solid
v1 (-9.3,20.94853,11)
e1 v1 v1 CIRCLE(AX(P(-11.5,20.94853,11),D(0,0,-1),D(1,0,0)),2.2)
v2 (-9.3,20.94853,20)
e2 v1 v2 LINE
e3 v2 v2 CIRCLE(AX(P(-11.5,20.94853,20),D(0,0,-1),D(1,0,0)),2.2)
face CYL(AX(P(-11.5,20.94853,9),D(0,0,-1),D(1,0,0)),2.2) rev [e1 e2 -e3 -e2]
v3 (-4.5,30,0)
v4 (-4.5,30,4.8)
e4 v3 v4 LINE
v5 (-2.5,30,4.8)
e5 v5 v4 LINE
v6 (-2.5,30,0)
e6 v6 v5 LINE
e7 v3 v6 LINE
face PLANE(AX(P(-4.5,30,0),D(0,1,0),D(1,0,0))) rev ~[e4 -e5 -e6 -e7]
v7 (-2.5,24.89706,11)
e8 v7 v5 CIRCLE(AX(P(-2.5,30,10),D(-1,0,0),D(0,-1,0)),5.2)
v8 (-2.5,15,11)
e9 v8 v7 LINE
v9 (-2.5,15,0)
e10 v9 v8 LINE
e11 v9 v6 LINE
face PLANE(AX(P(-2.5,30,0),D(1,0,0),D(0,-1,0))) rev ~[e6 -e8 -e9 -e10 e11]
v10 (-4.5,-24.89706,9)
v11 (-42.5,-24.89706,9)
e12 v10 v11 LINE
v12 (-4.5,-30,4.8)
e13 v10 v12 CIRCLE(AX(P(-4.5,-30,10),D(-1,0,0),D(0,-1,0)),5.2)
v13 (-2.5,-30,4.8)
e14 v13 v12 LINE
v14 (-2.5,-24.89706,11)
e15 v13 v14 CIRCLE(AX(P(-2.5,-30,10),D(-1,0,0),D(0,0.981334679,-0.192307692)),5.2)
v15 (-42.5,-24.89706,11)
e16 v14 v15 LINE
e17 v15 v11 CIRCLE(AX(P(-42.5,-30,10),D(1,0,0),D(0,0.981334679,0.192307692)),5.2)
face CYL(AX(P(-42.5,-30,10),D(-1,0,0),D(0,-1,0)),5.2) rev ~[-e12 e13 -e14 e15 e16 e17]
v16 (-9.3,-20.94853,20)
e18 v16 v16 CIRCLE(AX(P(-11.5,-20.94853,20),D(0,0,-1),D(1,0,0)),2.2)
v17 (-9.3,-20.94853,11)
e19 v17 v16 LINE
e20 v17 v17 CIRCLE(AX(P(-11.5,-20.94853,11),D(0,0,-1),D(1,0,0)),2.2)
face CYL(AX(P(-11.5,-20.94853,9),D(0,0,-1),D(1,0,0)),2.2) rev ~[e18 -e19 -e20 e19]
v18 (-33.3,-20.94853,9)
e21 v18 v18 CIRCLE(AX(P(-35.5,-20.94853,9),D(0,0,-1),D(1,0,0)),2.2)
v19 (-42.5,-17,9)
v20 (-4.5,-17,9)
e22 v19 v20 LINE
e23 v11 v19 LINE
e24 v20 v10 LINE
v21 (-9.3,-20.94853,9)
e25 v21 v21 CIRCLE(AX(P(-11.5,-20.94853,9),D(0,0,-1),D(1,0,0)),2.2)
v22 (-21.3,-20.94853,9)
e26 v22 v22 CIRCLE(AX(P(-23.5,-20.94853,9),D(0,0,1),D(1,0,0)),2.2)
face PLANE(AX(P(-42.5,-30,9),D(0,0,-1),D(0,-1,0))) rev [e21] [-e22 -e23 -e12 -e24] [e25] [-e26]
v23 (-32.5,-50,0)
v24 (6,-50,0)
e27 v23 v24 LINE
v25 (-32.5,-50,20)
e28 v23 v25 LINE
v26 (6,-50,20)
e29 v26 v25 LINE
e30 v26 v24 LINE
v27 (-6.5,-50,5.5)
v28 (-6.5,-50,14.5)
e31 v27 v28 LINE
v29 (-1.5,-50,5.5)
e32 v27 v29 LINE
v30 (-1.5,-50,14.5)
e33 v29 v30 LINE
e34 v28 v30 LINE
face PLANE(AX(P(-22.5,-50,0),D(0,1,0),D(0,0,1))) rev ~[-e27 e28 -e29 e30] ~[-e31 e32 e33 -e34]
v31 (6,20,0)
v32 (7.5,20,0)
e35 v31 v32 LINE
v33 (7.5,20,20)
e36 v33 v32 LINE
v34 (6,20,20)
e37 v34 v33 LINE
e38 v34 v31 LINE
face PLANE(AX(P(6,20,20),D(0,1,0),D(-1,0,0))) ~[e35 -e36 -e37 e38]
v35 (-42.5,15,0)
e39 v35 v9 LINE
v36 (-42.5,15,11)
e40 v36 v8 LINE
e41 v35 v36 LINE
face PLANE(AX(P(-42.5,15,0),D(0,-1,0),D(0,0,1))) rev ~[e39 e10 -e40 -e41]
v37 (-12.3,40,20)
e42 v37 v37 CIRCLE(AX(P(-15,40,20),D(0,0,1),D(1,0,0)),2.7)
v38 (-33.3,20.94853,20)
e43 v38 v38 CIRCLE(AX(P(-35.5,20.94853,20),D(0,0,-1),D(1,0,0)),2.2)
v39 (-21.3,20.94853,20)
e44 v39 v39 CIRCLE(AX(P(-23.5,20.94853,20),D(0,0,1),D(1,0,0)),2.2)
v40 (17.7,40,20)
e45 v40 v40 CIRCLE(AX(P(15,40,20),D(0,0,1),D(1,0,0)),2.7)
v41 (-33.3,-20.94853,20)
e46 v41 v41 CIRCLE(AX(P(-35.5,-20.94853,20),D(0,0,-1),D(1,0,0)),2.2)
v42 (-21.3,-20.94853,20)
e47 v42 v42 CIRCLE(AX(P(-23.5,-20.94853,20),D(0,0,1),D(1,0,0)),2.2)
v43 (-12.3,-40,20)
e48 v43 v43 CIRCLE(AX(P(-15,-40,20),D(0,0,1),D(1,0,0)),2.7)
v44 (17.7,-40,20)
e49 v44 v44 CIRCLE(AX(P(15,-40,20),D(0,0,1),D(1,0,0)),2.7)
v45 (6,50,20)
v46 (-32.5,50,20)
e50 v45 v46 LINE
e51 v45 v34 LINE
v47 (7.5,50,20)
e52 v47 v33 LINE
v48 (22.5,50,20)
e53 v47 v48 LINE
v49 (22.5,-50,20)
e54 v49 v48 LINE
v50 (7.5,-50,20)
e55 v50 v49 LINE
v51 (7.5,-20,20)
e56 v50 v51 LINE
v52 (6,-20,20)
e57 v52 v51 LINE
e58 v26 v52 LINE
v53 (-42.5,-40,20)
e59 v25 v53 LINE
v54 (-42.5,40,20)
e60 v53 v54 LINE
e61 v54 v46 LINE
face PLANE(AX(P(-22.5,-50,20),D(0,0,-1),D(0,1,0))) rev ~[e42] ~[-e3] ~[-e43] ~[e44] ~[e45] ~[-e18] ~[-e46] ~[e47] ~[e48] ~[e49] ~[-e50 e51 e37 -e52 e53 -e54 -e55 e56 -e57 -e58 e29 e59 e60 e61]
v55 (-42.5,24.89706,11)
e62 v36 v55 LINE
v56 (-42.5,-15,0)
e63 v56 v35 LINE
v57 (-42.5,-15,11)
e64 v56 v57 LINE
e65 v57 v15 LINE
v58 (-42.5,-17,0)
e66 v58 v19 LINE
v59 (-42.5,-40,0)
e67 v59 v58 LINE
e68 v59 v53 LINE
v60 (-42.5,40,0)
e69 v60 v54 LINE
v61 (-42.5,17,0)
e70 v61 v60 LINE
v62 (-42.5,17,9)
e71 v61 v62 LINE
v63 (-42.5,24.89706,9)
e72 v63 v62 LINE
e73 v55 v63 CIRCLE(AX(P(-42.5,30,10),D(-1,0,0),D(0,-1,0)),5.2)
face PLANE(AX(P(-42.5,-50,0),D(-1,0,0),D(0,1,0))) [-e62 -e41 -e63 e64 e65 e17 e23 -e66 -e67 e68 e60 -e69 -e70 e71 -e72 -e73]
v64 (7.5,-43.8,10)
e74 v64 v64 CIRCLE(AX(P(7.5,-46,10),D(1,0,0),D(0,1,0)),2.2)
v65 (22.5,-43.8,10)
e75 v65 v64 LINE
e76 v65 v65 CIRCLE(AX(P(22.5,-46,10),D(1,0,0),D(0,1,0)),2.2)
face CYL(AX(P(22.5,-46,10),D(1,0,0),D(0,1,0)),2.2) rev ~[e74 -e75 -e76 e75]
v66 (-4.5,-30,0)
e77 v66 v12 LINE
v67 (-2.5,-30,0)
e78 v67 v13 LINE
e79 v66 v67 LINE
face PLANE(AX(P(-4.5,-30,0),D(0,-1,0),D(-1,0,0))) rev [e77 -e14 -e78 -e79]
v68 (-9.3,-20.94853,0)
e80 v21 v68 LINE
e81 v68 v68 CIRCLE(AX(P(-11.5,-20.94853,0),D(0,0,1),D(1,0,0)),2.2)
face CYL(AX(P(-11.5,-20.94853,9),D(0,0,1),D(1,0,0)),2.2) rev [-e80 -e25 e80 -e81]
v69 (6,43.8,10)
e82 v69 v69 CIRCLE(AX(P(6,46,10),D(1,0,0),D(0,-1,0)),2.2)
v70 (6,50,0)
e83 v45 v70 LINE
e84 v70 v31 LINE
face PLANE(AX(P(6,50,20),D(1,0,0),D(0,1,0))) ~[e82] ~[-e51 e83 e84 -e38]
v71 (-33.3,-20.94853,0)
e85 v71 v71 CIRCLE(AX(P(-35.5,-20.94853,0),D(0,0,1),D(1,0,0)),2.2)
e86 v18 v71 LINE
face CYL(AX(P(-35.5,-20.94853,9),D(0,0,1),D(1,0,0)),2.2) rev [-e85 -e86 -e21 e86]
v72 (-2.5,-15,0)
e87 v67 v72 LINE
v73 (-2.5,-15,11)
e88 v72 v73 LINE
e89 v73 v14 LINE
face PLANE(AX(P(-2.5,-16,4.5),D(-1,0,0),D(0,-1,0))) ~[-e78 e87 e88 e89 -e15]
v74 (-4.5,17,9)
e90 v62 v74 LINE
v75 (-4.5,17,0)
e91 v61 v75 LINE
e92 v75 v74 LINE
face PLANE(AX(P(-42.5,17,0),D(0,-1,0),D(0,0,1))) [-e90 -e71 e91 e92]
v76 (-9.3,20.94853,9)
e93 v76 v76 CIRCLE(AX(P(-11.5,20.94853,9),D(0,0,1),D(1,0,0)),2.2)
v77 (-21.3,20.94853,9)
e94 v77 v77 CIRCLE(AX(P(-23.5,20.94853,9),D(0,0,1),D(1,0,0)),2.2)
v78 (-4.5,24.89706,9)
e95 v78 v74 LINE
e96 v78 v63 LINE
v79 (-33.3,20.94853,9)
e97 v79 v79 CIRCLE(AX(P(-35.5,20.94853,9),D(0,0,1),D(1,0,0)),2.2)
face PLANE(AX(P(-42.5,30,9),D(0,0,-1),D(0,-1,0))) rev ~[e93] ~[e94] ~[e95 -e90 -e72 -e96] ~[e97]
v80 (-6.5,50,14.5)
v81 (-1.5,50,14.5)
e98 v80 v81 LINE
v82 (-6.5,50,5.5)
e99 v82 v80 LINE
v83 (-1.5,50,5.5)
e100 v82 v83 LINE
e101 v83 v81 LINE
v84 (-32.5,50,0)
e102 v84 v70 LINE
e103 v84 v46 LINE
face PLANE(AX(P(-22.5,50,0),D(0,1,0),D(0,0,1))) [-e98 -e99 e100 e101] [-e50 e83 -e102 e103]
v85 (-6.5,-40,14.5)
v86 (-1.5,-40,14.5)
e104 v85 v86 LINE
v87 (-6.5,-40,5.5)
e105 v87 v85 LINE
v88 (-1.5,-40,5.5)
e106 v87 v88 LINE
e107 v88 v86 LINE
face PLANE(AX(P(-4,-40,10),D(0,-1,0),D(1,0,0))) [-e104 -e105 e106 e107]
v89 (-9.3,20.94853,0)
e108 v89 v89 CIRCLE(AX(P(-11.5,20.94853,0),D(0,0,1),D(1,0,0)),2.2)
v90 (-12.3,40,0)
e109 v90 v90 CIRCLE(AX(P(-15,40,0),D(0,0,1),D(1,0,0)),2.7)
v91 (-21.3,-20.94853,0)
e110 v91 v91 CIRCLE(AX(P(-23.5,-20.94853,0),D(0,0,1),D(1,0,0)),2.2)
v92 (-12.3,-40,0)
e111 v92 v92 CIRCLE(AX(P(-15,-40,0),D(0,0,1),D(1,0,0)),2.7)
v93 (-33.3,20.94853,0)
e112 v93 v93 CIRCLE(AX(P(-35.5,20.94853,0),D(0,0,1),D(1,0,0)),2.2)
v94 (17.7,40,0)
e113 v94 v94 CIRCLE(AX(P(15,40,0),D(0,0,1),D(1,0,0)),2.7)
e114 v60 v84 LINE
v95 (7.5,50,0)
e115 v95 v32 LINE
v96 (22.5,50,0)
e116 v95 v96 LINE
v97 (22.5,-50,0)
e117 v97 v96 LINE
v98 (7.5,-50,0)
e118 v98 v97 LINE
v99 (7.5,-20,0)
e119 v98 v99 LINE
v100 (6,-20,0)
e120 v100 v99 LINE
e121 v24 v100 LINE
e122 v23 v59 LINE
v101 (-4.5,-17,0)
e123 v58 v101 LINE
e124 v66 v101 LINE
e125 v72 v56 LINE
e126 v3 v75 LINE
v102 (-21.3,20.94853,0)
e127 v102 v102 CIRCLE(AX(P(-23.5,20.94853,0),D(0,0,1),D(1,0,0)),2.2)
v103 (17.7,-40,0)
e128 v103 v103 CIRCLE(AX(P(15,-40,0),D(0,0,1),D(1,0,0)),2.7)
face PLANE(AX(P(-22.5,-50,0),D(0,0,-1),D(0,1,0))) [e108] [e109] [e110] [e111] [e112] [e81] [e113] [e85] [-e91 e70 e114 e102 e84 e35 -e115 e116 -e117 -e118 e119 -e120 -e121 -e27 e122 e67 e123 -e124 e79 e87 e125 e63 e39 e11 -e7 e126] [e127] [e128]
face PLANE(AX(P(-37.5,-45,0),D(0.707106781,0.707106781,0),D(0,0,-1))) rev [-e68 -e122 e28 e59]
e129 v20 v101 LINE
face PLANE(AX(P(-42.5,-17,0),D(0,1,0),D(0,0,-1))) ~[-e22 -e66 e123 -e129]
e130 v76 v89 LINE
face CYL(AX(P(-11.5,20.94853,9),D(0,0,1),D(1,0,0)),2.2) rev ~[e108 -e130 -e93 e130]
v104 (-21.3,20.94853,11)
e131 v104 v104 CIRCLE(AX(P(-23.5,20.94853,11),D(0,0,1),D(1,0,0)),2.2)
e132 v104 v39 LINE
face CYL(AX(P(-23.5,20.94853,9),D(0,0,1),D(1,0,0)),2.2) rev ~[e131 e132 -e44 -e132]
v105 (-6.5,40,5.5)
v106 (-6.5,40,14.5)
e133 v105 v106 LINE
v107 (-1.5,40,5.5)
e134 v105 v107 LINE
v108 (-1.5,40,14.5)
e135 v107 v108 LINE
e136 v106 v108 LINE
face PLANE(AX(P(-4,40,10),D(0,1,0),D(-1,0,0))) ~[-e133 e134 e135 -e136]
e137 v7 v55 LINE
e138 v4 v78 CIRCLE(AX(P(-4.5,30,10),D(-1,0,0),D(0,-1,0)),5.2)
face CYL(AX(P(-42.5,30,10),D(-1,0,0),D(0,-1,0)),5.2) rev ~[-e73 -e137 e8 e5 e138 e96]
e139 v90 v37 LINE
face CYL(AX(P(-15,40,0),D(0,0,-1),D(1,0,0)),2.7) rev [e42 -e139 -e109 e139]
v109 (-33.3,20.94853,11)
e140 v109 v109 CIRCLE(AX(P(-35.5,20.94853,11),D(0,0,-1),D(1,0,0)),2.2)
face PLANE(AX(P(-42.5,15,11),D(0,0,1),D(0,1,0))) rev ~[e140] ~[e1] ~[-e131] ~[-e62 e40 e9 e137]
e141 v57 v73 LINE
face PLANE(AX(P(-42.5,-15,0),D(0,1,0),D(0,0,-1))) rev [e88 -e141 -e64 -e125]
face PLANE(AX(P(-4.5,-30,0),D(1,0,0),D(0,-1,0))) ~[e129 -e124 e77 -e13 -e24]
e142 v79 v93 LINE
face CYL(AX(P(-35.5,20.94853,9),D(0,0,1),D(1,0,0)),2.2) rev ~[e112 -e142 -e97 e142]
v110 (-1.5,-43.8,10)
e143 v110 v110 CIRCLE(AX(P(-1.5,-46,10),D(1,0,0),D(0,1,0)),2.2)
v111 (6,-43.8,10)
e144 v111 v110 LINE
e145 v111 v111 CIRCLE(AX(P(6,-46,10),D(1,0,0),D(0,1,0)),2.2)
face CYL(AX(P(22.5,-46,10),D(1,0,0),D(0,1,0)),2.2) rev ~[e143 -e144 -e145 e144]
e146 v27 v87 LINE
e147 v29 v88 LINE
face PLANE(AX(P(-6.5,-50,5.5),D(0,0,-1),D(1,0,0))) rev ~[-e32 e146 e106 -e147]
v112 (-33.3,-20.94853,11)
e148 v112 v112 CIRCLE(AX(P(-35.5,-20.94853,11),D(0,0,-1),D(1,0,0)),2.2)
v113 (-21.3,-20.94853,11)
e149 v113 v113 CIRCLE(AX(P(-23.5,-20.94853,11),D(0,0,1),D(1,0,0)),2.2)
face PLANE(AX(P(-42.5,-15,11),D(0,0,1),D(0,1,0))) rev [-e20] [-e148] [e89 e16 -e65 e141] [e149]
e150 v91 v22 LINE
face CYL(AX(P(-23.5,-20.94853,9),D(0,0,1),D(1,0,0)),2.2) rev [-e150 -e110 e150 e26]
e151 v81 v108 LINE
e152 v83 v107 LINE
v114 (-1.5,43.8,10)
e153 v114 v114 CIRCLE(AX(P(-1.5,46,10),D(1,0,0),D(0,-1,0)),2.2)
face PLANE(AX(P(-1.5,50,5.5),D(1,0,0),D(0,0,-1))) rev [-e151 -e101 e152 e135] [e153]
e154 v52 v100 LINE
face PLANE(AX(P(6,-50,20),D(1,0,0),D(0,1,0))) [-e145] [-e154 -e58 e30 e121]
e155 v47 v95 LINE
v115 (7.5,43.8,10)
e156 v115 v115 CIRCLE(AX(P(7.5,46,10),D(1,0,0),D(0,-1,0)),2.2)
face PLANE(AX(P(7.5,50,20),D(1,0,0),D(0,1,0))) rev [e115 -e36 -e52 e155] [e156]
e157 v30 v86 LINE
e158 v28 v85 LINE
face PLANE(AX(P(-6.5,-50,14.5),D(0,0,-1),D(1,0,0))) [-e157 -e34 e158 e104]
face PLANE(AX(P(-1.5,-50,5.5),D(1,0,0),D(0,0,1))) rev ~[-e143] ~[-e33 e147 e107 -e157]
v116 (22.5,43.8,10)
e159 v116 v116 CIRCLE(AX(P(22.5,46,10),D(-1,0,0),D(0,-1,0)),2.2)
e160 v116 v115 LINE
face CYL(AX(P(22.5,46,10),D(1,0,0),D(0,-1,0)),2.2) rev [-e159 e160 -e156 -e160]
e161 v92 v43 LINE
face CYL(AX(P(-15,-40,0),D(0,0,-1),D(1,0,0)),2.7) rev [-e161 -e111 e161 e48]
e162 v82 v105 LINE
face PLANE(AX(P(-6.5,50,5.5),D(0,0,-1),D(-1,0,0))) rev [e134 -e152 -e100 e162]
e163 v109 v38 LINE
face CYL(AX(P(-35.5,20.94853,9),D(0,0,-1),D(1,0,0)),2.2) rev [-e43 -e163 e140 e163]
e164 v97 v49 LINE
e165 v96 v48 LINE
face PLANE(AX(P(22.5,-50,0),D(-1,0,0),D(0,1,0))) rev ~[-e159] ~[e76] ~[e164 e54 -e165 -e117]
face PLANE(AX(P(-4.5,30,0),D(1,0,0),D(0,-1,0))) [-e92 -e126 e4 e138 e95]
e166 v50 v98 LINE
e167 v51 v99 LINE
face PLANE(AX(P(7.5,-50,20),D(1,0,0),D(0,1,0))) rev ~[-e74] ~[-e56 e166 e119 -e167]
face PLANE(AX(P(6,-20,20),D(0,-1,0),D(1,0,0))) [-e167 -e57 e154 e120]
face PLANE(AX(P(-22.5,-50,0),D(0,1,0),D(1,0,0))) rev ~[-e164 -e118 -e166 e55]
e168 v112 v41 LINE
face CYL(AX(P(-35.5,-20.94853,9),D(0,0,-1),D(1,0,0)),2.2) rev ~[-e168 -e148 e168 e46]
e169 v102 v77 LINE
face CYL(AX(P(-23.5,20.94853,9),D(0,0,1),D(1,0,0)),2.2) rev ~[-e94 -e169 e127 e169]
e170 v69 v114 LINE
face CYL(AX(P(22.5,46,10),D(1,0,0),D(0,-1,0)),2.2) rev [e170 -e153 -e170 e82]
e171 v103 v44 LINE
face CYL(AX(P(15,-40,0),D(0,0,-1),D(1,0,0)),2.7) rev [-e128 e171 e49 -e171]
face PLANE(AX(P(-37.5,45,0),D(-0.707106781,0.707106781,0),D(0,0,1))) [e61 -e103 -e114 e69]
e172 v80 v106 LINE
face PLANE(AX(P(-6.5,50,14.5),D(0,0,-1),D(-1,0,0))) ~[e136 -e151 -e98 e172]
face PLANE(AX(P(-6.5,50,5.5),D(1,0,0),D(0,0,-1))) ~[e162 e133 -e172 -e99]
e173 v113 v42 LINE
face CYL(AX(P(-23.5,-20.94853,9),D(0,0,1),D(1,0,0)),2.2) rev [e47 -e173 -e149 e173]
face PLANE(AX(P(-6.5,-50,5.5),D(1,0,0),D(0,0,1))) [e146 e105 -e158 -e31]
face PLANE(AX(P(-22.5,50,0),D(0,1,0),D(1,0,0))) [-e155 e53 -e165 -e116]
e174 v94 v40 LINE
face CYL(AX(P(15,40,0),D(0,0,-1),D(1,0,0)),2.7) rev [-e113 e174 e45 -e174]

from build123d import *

# Parameters (mm, degrees)
F0_W      = 45
F0_H      = 100
F0_R      = 2.7
F1_DEPTH  = 20
F2_W      = 1.5
F2_H      = 30
F3_DEPTH  = 25
F4_R      = 2.2
F5_DEPTH  = 25
F6_DEPTH  = 20
F7_R      = 5.2
F8_DEPTH  = 40
F9_W      = 2
F9_H      = 9
F10_DEPTH = 40
F11_W     = 2
F11_H     = 15
F12_DEPTH = 10
F13_R     = 2.2
F14_DEPTH = 25
F15_SIZE  = 10
F16_W     = 5
F16_H     = 9
F17_DEPTH = 10


# Not quite as in the source:
# - a pattern or mirror of a feature is missing from the dataset's text; its kind, count and spacing are read off the source's solid


with BuildPart() as f1:
    # F0 (on Top) → F1 (new body)
    with BuildSketch(Plane.XY):
        Rectangle(F0_W, F0_H)
        with Locations((-15, -40)):
            Circle(F0_R, mode=Mode.SUBTRACT)
        with Locations((15, -40)):
            Circle(F0_R, mode=Mode.SUBTRACT)
        with Locations((-15, 40)):
            Circle(F0_R, mode=Mode.SUBTRACT)
        with Locations((15, 40)):
            Circle(F0_R, mode=Mode.SUBTRACT)
    extrude(amount=F1_DEPTH)

    # F2 (on face) → F3 (cut)
    with BuildSketch(Plane.XY.offset(20)):
        with Locations((6.75, -35)):
            Rectangle(F2_W, F2_H)
    f3 = extrude(amount=-F3_DEPTH, mode=Mode.SUBTRACT)

    # F3_copies: F3 across plane
    add(f3.mirror(Plane.ZX), mode=Mode.SUBTRACT)

    # F4 (on face) → F5 (cut)
    with BuildSketch(Plane.YZ.offset(22.5)):
        with Locations((-46, 10)):
            Circle(F4_R)
    f5 = extrude(amount=-F5_DEPTH, mode=Mode.SUBTRACT)

    # F5_copies: F5 across plane
    add(f5.mirror(Plane.ZX), mode=Mode.SUBTRACT)

    # F6 (add): a face of the model
    f6_faces = [f1.faces().sort_by_distance(p)[0] for p in [
        (-22.5, 0, 10),
    ]]
    extrude(f6_faces, amount=F6_DEPTH)

    # F7 (on face) → F8 (cut)
    with BuildSketch(Plane(origin=(-42.5, 0, 0), x_dir=(0, -1, 0), z_dir=(-1, 0, 0))):
        with Locations((-30, 10)):
            Circle(F7_R)
        with Locations((30, 10)):
            Circle(F7_R)
    extrude(amount=-F8_DEPTH, mode=Mode.SUBTRACT)

    # F9 (on face) → F10 (cut)
    with BuildSketch(Plane(origin=(-42.5, 0, 0), x_dir=(0, -1, 0), z_dir=(-1, 0, 0))):
        with Locations((-16, 4.5)):
            Rectangle(F9_W, F9_H)
        Polygon((-17, 9), (-15, 9), (-15, 11), (-30, 11), (-30, 9), align=None)
    f10 = extrude(amount=-F10_DEPTH, mode=Mode.SUBTRACT)

    # F10_copies: F10 across plane
    add(f10.mirror(Plane(origin=(0, 0, 0), x_dir=(0, 0, -1), z_dir=(0, -1, 0))), mode=Mode.SUBTRACT)

    # F11 (on face) → F12 (cut)
    with BuildSketch(Plane(origin=(0, 0, 0), x_dir=(1, 0, 0), z_dir=(0, 0, -1))):
        with Locations((-3.5, -22.5)):
            Rectangle(F11_W, F11_H)
    f12 = extrude(amount=-F12_DEPTH, mode=Mode.SUBTRACT)

    # F12_copies: F12 across plane
    add(f12.mirror(Plane(origin=(0, 0, 0), x_dir=(0, 0, -1), z_dir=(0, -1, 0))), mode=Mode.SUBTRACT)

    # F13 (on face) → F14 (cut, symmetric)
    with BuildSketch(Plane.XY.offset(9)):
        with Locations((-35.5, 20.9485298356)):
            Circle(F13_R)
        with Locations((-11.5, 20.9485298356)):
            Circle(F13_R)
        with Locations((-23.5, 20.9485298356)):
            Circle(F13_R)
    f14 = extrude(amount=F14_DEPTH, both=True, mode=Mode.SUBTRACT)

    # F14_copies: F14 across plane
    add(f14.mirror(Plane(origin=(0, 0, 0), x_dir=(0, 0, -1), z_dir=(0, -1, 0))), mode=Mode.SUBTRACT)

    # F15
    f15_edges = [f1.edges().sort_by_distance(p)[0] for p in [
        (-42.5, 50, 10),
        (-42.5, -50, 10),
    ]]
    chamfer(f15_edges, length=F15_SIZE)

    # F16 (on face) → F17 (cut)
    with BuildSketch(Plane.XZ.offset(50)):
        with Locations((-4, 10)):
            Rectangle(F16_W, F16_H)
    f17 = extrude(amount=-F17_DEPTH, mode=Mode.SUBTRACT)

    # F17_copies: F17 across plane
    add(f17.mirror(Plane.ZX), mode=Mode.SUBTRACT)


solid = f1.part
